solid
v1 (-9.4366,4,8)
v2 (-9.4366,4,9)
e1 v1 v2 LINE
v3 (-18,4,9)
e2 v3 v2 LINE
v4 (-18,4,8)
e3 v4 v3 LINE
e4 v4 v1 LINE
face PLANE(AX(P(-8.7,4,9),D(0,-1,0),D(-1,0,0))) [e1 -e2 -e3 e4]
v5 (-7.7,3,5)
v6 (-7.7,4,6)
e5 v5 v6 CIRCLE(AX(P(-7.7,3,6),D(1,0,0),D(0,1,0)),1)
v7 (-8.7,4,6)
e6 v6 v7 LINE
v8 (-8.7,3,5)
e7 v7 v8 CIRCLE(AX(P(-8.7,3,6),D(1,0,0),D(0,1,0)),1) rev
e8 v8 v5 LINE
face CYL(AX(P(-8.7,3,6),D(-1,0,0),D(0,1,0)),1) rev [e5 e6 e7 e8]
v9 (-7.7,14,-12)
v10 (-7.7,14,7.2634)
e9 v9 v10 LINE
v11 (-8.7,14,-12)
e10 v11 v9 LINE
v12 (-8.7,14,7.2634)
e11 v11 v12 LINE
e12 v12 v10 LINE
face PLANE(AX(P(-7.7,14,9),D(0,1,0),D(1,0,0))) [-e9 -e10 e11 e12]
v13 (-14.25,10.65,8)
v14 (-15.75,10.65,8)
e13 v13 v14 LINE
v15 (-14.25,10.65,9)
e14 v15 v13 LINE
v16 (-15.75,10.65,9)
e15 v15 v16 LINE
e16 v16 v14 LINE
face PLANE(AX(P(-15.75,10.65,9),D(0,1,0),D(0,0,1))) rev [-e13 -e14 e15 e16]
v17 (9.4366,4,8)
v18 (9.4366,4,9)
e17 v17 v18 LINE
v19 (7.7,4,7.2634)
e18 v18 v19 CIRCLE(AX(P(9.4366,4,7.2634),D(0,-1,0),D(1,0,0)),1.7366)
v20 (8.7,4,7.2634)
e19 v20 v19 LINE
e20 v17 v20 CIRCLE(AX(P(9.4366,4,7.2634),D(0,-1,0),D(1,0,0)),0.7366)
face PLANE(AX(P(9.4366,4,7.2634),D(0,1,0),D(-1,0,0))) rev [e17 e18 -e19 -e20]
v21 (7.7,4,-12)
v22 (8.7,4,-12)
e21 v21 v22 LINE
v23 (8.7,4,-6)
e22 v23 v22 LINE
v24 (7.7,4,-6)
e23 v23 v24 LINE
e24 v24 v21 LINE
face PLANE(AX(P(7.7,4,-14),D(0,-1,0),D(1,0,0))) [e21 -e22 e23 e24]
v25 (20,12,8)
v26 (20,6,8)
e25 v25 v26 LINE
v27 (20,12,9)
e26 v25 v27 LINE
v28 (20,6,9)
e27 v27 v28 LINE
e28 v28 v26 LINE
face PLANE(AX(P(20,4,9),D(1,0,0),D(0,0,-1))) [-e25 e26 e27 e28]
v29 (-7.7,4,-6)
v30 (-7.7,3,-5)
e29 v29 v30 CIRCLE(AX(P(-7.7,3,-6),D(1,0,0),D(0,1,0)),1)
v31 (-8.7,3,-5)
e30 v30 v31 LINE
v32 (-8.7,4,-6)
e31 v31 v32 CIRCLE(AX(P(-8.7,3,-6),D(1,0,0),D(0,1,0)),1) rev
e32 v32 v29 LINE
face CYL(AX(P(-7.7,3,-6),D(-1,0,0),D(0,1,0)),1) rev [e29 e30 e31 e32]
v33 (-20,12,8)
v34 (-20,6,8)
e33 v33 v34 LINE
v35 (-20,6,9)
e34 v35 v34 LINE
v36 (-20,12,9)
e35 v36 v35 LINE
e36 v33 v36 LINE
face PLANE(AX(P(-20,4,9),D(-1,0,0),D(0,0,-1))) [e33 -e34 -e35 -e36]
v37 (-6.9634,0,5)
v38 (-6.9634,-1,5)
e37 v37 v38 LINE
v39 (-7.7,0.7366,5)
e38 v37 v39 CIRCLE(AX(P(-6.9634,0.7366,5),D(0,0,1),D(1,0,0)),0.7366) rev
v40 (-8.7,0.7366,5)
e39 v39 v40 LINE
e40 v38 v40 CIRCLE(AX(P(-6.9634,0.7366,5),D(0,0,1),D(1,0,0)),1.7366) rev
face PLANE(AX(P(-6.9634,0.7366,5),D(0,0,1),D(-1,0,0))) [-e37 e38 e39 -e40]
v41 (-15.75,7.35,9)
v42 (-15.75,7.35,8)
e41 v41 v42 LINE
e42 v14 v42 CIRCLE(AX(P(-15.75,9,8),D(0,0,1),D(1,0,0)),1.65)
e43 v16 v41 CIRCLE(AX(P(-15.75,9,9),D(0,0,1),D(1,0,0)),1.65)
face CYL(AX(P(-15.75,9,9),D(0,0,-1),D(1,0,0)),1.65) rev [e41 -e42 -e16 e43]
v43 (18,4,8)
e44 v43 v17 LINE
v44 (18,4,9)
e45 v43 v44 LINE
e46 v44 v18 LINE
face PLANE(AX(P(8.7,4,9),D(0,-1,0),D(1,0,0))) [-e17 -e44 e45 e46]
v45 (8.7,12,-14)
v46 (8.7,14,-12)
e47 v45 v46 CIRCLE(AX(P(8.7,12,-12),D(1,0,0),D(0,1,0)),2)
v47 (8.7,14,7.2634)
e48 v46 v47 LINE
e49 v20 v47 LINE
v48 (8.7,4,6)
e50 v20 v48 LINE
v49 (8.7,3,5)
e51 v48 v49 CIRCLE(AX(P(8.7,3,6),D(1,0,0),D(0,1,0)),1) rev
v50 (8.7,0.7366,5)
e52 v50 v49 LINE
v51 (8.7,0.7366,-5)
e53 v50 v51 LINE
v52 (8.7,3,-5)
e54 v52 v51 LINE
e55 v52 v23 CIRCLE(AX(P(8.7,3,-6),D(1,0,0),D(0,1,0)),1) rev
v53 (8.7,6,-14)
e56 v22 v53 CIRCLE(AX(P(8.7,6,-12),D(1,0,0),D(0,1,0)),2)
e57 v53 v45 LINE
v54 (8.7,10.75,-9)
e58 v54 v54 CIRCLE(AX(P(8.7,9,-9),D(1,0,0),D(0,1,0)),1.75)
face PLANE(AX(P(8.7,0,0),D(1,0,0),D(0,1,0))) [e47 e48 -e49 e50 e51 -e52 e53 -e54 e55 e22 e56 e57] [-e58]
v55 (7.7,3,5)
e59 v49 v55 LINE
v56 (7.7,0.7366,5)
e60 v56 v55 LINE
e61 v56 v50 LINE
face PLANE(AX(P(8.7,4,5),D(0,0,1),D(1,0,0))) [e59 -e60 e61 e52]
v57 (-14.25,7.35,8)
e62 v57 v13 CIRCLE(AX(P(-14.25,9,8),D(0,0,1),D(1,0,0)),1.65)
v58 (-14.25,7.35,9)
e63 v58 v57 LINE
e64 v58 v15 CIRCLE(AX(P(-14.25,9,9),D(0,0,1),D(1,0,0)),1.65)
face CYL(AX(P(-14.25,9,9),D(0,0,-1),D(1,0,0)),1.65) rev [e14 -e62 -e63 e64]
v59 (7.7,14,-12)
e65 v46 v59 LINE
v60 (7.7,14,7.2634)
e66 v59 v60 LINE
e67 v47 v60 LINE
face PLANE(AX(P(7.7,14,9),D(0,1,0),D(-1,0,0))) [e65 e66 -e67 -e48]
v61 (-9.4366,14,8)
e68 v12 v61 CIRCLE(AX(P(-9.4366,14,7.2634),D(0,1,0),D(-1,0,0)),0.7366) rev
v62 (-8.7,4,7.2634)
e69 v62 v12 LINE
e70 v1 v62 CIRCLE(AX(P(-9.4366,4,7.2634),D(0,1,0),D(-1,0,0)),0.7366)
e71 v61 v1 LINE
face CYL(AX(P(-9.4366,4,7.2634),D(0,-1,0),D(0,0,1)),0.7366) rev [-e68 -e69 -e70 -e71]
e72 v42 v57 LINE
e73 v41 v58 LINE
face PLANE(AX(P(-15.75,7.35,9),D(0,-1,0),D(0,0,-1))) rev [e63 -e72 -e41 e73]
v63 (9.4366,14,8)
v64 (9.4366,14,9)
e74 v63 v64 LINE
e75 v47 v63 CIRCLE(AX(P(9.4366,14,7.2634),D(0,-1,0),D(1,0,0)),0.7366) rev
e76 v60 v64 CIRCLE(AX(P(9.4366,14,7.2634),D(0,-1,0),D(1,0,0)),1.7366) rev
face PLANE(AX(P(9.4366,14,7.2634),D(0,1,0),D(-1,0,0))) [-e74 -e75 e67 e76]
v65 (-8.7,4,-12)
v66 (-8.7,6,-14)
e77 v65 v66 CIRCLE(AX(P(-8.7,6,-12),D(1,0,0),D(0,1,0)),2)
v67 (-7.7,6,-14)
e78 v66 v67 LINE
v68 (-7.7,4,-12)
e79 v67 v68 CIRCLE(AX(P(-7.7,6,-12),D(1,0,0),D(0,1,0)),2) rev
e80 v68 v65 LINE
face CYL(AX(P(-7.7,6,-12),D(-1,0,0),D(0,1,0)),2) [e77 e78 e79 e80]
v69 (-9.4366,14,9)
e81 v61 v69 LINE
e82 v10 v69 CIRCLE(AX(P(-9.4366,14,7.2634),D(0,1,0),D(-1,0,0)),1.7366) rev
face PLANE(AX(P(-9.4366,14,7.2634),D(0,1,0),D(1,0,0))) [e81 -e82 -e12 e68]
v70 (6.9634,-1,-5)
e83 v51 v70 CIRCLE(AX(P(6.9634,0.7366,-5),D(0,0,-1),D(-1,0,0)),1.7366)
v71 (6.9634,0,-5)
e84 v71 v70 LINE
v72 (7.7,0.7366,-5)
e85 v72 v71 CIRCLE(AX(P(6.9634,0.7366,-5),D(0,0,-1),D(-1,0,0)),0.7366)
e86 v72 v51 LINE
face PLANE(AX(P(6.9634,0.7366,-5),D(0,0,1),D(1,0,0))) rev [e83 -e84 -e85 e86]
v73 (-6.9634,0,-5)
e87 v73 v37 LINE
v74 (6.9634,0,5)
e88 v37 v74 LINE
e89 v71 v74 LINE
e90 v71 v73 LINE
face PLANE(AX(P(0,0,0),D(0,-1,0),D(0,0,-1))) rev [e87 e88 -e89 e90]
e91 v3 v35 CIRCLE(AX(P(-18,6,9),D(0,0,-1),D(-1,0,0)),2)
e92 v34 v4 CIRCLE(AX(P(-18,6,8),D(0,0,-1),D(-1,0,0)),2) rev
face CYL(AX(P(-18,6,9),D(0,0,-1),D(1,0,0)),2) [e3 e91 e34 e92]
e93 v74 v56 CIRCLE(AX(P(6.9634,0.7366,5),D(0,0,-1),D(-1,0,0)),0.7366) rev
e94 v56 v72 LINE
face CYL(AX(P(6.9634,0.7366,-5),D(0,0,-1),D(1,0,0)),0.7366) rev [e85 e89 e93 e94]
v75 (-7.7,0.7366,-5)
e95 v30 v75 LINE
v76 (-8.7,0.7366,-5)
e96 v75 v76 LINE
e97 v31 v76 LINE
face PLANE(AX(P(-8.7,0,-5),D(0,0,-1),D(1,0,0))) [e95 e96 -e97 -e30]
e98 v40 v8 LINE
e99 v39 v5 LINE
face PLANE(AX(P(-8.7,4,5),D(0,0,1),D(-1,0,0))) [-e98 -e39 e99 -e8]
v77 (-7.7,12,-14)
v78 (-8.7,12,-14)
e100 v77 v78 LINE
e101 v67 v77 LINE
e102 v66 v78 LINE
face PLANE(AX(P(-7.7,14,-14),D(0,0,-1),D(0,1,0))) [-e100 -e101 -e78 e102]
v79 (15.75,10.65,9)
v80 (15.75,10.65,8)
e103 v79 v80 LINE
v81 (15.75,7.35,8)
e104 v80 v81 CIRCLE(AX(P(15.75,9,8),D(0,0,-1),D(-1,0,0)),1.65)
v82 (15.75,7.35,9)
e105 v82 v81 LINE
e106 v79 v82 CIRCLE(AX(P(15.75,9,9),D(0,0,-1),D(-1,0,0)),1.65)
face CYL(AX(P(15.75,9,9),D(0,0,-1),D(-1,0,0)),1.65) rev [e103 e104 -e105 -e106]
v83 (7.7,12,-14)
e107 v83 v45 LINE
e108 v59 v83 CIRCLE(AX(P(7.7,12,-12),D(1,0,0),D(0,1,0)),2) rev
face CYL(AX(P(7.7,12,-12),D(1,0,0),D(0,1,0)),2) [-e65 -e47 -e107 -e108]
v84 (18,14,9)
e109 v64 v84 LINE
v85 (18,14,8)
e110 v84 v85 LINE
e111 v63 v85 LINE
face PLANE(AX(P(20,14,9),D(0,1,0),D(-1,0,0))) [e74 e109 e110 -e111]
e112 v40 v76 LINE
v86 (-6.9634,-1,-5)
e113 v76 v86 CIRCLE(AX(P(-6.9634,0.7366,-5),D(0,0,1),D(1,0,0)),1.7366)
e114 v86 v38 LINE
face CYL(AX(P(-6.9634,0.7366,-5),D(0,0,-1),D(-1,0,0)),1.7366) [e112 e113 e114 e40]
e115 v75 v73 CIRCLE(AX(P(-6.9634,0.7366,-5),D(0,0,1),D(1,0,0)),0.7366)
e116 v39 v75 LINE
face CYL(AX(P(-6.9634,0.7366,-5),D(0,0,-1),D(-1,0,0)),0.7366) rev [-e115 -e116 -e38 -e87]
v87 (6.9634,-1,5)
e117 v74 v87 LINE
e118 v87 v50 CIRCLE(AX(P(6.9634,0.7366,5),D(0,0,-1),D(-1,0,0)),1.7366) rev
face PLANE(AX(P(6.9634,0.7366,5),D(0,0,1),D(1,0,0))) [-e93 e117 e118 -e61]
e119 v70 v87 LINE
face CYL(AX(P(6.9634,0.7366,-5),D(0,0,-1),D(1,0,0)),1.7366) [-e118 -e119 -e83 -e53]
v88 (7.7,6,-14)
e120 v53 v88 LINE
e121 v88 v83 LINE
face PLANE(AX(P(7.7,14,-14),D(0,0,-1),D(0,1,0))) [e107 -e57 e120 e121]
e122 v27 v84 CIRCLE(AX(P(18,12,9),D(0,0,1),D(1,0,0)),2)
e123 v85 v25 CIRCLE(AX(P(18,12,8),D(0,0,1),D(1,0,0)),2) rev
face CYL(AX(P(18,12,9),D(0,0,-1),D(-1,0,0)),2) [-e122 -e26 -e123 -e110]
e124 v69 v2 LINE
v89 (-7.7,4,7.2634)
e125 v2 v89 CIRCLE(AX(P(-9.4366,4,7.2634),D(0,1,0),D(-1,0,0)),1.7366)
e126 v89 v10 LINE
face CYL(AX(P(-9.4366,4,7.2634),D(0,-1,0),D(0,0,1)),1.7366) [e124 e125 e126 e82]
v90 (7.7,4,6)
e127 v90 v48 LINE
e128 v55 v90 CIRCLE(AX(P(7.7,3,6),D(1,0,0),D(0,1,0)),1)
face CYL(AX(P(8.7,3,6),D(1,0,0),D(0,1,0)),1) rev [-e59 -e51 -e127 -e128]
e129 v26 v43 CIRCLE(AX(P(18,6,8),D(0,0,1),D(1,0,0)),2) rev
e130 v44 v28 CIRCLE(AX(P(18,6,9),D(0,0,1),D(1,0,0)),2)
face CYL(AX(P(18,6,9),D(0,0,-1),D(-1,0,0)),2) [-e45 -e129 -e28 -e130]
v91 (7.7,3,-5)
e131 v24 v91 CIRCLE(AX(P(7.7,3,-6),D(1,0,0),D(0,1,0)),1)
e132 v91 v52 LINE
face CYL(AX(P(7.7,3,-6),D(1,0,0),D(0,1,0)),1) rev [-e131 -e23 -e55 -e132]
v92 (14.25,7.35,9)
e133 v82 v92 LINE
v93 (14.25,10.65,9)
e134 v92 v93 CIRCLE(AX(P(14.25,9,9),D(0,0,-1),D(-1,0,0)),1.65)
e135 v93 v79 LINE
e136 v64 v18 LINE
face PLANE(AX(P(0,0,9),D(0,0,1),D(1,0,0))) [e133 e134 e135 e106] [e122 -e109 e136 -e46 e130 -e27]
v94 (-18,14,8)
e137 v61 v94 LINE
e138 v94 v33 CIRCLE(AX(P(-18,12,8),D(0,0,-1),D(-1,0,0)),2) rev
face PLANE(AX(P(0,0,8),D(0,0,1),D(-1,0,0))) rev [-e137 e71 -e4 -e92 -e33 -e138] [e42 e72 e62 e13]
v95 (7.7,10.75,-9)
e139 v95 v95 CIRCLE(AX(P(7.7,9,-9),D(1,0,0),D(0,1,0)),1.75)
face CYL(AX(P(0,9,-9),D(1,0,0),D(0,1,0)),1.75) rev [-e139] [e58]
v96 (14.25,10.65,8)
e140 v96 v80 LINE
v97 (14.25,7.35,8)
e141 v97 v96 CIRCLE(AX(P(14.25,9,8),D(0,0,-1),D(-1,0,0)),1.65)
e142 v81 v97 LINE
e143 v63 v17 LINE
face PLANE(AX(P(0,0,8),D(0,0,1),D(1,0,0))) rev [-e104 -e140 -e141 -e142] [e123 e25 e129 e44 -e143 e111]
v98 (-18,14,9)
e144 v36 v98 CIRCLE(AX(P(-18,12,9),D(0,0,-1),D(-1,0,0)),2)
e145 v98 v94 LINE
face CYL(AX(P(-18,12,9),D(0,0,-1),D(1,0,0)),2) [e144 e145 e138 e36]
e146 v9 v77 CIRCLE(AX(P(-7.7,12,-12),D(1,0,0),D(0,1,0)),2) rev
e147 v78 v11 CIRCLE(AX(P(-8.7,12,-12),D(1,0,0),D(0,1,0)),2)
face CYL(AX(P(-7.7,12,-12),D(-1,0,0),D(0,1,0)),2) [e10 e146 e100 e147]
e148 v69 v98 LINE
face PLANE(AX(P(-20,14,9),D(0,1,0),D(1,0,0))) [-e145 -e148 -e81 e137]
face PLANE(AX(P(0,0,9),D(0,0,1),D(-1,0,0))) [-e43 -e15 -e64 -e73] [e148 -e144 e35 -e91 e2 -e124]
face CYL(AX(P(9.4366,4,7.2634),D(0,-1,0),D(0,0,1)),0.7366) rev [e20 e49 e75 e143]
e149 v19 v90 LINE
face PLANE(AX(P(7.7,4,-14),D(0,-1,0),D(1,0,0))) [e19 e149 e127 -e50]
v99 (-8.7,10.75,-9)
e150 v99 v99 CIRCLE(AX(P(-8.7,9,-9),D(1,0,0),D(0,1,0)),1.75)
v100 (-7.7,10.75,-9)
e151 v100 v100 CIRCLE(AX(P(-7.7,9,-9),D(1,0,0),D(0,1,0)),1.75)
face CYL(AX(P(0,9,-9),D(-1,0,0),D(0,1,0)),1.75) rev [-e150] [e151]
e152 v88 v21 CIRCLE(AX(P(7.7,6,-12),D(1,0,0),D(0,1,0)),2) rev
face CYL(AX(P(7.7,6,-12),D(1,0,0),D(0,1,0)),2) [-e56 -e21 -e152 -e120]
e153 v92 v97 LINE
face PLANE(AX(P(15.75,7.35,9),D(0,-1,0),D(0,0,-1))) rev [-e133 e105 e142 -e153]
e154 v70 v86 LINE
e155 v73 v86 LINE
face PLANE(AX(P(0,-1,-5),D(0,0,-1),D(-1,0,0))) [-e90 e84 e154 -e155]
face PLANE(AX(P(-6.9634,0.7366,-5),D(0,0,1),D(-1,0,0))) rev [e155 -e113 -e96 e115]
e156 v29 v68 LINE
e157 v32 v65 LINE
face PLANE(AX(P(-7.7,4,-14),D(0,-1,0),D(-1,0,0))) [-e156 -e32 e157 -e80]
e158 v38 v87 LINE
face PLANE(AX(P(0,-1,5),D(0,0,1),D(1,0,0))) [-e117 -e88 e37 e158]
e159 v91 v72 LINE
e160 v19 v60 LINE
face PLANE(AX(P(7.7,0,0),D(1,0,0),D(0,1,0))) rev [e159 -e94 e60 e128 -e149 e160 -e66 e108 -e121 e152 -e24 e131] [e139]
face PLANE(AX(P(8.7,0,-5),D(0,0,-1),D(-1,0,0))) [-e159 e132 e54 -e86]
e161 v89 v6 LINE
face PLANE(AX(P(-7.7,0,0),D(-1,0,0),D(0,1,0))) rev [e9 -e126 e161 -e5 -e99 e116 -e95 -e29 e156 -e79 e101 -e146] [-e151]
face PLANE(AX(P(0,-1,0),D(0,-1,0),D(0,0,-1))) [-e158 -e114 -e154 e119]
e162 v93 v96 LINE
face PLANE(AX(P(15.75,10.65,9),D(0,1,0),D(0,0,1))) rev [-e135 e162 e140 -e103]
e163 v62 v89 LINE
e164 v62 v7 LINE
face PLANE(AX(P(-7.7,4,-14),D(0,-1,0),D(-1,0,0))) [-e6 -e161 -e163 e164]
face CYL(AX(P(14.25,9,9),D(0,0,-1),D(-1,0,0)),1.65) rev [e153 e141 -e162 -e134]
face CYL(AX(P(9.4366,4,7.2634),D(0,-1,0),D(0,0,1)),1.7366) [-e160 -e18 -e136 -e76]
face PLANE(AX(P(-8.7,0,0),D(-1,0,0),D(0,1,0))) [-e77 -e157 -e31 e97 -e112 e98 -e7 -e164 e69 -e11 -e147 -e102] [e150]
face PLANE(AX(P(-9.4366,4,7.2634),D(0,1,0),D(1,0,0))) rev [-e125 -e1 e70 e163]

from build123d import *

# Parameters (mm, degrees)
SKETCH1_W                    = 7.7
SKETCH1_H                    = 10
BASE_FLANGE1_DEPTH           = 1
EDGE_FLANGE1_STRIP_W         = 5.4732
EDGE_FLANGE1_STRIP_H         = 1
EDGE_FLANGE1_STRIP_CUT_DEPTH = 10
EDGE_FLANGE1_DEPTH           = 10
SKETCH11_W                   = 23
SKETCH11_H                   = 10
TAB1_DEPTH                   = 1
FILLET1_R                    = 1
FILLET2_R                    = 2
SKETCH15_R                   = 1.75
CUT_EXTRUDE1_DEPTH           = 22.626141588
EDGE_FLANGE2_STRIP_W         = 5.4732
EDGE_FLANGE2_STRIP_H         = 1
EDGE_FLANGE2_STRIP_CUT_DEPTH = 10
EDGE_FLANGE2_DEPTH           = 10
CUT_EXTRUDE2_DEPTH           = 33.86335345
FILLET3_R                    = 2


# Sheet-metal steps are written as plain solids
with BuildPart() as part:
    # Sketch1 → Base-Flange1 (new body)
    with BuildSketch(Plane(origin=(0, 0, 0), x_dir=(1, 0, 0), z_dir=(0, 1, 0))):
        with Locations((3.85, 0)):
            Rectangle(SKETCH1_W, SKETCH1_H)
    extrude(amount=-BASE_FLANGE1_DEPTH)

    # Edge-Flange1 strip (across the edge) → Edge-Flange1 strip cut (cut)
    with BuildSketch(Plane(origin=(7.7, 0, 5), x_dir=(-1, 0, 0), z_dir=(0, 0, -1))):
        with Locations((-2, -0.5)):
            Rectangle(EDGE_FLANGE1_STRIP_W, EDGE_FLANGE1_STRIP_H)
    extrude(amount=EDGE_FLANGE1_STRIP_CUT_DEPTH, mode=Mode.SUBTRACT)

    # Edge-Flange1 section (across the edge) → Edge-Flange1 (add)
    with BuildSketch(Plane(origin=(7.7, 0, 5), x_dir=(-1, 0, 0), z_dir=(0, 0, -1))):
        with BuildLine():
            Line((-1, 0.7366), (-1, 4))
            Line((-1, 4), (0, 4))
            Line((0, 4), (0, 0.7366))
            ThreePointArc((0, 0.7366), (0.215745145, 0.215745145), (0.7366, 0))
            Line((0.7366, 0), (0.7366, -1))
            ThreePointArc((0.7366, -1), (-0.491361636, -0.491361636), (-1, 0.7366))
        make_face()
    extrude(amount=EDGE_FLANGE1_DEPTH)

    # Sketch11 → Tab1 (add)
    with BuildSketch(Plane(origin=(8.7, 0, 0), x_dir=(0, 0, -1), z_dir=(1, 0, 0))):
        with Locations((2.5, 9)):
            Rectangle(SKETCH11_W, SKETCH11_H)
    extrude(amount=-TAB1_DEPTH)

    # Fillet1
    fillet1_edges = [part.edges().sort_by_distance(p)[0] for p in [
        (8.2, 4, 5),
        (8.2, 4, -5),
    ]]
    fillet(fillet1_edges, radius=FILLET1_R)

    # Fillet2
    fillet2_edges = [part.edges().sort_by_distance(p)[0] for p in [
        (8.2, 14, -14),
        (8.2, 4, -14),
    ]]
    fillet(fillet2_edges, radius=FILLET2_R)

    # Sketch15 → Cut-Extrude1 (cut, through all)
    with BuildSketch(Plane(origin=(8.7, 0, 0), x_dir=(0, 0, -1), z_dir=(1, 0, 0))):
        with Locations(Location((9, 9, 0), (0, 0, 90))):
            Circle(SKETCH15_R)
    extrude(amount=-CUT_EXTRUDE1_DEPTH, mode=Mode.SUBTRACT)

    # Edge-Flange2 strip (across the edge) → Edge-Flange2 strip cut (cut)
    with BuildSketch(Plane(origin=(8.7, 14, 9), x_dir=(0, 0, -1), z_dir=(0, -1, 0))):
        with Locations((-1, -0.5)):
            Rectangle(EDGE_FLANGE2_STRIP_W, EDGE_FLANGE2_STRIP_H)
    extrude(amount=EDGE_FLANGE2_STRIP_CUT_DEPTH, mode=Mode.SUBTRACT)

    # Edge-Flange2 section (across the edge) → Edge-Flange2 (add)
    with BuildSketch(Plane(origin=(8.7, 14, 9), x_dir=(0, 0, -1), z_dir=(0, -1, 0))):
        with BuildLine():
            Line((0, 0.7366), (0, 11.3))
            Line((0, 11.3), (1, 11.3))
            Line((1, 11.3), (1, 0.7366))
            ThreePointArc((1, 0.7366), (1.215745145, 0.215745145), (1.7366, 0))
            Line((1.7366, 0), (1.7366, -1))
            ThreePointArc((1.7366, -1), (0.508638364, -0.491361636), (0, 0.7366))
        make_face()
    extrude(amount=EDGE_FLANGE2_DEPTH)

    # Sketch23 → Cut-Extrude2 (cut, through all)
    with BuildSketch(Plane(origin=(0, 0, 8), x_dir=(-1, 0, 0), z_dir=(0, 0, -1))):
        with BuildLine():
            Line((-15.75, 10.65), (-14.25, 10.65))
            ThreePointArc((-14.25, 10.65), (-12.6, 9), (-14.25, 7.35))
            Line((-14.25, 7.35), (-15.75, 7.35))
            ThreePointArc((-15.75, 7.35), (-17.4, 9), (-15.75, 10.65))
        make_face()
    extrude(amount=-CUT_EXTRUDE2_DEPTH, mode=Mode.SUBTRACT)

    # Fillet3
    fillet3_edges = [part.edges().sort_by_distance(p)[0] for p in [
        (20, 14, 8.5),
        (20, 4, 8.5),
    ]]
    fillet(fillet3_edges, radius=FILLET3_R)

    # Mirror1: part across plane


with BuildPart() as part_1:
    add(part.part)
    add(part.part.mirror(Plane(origin=(0, -1, -5), x_dir=(0, 0, 1), z_dir=(-1, 0, 0))))


solid = part_1.part
